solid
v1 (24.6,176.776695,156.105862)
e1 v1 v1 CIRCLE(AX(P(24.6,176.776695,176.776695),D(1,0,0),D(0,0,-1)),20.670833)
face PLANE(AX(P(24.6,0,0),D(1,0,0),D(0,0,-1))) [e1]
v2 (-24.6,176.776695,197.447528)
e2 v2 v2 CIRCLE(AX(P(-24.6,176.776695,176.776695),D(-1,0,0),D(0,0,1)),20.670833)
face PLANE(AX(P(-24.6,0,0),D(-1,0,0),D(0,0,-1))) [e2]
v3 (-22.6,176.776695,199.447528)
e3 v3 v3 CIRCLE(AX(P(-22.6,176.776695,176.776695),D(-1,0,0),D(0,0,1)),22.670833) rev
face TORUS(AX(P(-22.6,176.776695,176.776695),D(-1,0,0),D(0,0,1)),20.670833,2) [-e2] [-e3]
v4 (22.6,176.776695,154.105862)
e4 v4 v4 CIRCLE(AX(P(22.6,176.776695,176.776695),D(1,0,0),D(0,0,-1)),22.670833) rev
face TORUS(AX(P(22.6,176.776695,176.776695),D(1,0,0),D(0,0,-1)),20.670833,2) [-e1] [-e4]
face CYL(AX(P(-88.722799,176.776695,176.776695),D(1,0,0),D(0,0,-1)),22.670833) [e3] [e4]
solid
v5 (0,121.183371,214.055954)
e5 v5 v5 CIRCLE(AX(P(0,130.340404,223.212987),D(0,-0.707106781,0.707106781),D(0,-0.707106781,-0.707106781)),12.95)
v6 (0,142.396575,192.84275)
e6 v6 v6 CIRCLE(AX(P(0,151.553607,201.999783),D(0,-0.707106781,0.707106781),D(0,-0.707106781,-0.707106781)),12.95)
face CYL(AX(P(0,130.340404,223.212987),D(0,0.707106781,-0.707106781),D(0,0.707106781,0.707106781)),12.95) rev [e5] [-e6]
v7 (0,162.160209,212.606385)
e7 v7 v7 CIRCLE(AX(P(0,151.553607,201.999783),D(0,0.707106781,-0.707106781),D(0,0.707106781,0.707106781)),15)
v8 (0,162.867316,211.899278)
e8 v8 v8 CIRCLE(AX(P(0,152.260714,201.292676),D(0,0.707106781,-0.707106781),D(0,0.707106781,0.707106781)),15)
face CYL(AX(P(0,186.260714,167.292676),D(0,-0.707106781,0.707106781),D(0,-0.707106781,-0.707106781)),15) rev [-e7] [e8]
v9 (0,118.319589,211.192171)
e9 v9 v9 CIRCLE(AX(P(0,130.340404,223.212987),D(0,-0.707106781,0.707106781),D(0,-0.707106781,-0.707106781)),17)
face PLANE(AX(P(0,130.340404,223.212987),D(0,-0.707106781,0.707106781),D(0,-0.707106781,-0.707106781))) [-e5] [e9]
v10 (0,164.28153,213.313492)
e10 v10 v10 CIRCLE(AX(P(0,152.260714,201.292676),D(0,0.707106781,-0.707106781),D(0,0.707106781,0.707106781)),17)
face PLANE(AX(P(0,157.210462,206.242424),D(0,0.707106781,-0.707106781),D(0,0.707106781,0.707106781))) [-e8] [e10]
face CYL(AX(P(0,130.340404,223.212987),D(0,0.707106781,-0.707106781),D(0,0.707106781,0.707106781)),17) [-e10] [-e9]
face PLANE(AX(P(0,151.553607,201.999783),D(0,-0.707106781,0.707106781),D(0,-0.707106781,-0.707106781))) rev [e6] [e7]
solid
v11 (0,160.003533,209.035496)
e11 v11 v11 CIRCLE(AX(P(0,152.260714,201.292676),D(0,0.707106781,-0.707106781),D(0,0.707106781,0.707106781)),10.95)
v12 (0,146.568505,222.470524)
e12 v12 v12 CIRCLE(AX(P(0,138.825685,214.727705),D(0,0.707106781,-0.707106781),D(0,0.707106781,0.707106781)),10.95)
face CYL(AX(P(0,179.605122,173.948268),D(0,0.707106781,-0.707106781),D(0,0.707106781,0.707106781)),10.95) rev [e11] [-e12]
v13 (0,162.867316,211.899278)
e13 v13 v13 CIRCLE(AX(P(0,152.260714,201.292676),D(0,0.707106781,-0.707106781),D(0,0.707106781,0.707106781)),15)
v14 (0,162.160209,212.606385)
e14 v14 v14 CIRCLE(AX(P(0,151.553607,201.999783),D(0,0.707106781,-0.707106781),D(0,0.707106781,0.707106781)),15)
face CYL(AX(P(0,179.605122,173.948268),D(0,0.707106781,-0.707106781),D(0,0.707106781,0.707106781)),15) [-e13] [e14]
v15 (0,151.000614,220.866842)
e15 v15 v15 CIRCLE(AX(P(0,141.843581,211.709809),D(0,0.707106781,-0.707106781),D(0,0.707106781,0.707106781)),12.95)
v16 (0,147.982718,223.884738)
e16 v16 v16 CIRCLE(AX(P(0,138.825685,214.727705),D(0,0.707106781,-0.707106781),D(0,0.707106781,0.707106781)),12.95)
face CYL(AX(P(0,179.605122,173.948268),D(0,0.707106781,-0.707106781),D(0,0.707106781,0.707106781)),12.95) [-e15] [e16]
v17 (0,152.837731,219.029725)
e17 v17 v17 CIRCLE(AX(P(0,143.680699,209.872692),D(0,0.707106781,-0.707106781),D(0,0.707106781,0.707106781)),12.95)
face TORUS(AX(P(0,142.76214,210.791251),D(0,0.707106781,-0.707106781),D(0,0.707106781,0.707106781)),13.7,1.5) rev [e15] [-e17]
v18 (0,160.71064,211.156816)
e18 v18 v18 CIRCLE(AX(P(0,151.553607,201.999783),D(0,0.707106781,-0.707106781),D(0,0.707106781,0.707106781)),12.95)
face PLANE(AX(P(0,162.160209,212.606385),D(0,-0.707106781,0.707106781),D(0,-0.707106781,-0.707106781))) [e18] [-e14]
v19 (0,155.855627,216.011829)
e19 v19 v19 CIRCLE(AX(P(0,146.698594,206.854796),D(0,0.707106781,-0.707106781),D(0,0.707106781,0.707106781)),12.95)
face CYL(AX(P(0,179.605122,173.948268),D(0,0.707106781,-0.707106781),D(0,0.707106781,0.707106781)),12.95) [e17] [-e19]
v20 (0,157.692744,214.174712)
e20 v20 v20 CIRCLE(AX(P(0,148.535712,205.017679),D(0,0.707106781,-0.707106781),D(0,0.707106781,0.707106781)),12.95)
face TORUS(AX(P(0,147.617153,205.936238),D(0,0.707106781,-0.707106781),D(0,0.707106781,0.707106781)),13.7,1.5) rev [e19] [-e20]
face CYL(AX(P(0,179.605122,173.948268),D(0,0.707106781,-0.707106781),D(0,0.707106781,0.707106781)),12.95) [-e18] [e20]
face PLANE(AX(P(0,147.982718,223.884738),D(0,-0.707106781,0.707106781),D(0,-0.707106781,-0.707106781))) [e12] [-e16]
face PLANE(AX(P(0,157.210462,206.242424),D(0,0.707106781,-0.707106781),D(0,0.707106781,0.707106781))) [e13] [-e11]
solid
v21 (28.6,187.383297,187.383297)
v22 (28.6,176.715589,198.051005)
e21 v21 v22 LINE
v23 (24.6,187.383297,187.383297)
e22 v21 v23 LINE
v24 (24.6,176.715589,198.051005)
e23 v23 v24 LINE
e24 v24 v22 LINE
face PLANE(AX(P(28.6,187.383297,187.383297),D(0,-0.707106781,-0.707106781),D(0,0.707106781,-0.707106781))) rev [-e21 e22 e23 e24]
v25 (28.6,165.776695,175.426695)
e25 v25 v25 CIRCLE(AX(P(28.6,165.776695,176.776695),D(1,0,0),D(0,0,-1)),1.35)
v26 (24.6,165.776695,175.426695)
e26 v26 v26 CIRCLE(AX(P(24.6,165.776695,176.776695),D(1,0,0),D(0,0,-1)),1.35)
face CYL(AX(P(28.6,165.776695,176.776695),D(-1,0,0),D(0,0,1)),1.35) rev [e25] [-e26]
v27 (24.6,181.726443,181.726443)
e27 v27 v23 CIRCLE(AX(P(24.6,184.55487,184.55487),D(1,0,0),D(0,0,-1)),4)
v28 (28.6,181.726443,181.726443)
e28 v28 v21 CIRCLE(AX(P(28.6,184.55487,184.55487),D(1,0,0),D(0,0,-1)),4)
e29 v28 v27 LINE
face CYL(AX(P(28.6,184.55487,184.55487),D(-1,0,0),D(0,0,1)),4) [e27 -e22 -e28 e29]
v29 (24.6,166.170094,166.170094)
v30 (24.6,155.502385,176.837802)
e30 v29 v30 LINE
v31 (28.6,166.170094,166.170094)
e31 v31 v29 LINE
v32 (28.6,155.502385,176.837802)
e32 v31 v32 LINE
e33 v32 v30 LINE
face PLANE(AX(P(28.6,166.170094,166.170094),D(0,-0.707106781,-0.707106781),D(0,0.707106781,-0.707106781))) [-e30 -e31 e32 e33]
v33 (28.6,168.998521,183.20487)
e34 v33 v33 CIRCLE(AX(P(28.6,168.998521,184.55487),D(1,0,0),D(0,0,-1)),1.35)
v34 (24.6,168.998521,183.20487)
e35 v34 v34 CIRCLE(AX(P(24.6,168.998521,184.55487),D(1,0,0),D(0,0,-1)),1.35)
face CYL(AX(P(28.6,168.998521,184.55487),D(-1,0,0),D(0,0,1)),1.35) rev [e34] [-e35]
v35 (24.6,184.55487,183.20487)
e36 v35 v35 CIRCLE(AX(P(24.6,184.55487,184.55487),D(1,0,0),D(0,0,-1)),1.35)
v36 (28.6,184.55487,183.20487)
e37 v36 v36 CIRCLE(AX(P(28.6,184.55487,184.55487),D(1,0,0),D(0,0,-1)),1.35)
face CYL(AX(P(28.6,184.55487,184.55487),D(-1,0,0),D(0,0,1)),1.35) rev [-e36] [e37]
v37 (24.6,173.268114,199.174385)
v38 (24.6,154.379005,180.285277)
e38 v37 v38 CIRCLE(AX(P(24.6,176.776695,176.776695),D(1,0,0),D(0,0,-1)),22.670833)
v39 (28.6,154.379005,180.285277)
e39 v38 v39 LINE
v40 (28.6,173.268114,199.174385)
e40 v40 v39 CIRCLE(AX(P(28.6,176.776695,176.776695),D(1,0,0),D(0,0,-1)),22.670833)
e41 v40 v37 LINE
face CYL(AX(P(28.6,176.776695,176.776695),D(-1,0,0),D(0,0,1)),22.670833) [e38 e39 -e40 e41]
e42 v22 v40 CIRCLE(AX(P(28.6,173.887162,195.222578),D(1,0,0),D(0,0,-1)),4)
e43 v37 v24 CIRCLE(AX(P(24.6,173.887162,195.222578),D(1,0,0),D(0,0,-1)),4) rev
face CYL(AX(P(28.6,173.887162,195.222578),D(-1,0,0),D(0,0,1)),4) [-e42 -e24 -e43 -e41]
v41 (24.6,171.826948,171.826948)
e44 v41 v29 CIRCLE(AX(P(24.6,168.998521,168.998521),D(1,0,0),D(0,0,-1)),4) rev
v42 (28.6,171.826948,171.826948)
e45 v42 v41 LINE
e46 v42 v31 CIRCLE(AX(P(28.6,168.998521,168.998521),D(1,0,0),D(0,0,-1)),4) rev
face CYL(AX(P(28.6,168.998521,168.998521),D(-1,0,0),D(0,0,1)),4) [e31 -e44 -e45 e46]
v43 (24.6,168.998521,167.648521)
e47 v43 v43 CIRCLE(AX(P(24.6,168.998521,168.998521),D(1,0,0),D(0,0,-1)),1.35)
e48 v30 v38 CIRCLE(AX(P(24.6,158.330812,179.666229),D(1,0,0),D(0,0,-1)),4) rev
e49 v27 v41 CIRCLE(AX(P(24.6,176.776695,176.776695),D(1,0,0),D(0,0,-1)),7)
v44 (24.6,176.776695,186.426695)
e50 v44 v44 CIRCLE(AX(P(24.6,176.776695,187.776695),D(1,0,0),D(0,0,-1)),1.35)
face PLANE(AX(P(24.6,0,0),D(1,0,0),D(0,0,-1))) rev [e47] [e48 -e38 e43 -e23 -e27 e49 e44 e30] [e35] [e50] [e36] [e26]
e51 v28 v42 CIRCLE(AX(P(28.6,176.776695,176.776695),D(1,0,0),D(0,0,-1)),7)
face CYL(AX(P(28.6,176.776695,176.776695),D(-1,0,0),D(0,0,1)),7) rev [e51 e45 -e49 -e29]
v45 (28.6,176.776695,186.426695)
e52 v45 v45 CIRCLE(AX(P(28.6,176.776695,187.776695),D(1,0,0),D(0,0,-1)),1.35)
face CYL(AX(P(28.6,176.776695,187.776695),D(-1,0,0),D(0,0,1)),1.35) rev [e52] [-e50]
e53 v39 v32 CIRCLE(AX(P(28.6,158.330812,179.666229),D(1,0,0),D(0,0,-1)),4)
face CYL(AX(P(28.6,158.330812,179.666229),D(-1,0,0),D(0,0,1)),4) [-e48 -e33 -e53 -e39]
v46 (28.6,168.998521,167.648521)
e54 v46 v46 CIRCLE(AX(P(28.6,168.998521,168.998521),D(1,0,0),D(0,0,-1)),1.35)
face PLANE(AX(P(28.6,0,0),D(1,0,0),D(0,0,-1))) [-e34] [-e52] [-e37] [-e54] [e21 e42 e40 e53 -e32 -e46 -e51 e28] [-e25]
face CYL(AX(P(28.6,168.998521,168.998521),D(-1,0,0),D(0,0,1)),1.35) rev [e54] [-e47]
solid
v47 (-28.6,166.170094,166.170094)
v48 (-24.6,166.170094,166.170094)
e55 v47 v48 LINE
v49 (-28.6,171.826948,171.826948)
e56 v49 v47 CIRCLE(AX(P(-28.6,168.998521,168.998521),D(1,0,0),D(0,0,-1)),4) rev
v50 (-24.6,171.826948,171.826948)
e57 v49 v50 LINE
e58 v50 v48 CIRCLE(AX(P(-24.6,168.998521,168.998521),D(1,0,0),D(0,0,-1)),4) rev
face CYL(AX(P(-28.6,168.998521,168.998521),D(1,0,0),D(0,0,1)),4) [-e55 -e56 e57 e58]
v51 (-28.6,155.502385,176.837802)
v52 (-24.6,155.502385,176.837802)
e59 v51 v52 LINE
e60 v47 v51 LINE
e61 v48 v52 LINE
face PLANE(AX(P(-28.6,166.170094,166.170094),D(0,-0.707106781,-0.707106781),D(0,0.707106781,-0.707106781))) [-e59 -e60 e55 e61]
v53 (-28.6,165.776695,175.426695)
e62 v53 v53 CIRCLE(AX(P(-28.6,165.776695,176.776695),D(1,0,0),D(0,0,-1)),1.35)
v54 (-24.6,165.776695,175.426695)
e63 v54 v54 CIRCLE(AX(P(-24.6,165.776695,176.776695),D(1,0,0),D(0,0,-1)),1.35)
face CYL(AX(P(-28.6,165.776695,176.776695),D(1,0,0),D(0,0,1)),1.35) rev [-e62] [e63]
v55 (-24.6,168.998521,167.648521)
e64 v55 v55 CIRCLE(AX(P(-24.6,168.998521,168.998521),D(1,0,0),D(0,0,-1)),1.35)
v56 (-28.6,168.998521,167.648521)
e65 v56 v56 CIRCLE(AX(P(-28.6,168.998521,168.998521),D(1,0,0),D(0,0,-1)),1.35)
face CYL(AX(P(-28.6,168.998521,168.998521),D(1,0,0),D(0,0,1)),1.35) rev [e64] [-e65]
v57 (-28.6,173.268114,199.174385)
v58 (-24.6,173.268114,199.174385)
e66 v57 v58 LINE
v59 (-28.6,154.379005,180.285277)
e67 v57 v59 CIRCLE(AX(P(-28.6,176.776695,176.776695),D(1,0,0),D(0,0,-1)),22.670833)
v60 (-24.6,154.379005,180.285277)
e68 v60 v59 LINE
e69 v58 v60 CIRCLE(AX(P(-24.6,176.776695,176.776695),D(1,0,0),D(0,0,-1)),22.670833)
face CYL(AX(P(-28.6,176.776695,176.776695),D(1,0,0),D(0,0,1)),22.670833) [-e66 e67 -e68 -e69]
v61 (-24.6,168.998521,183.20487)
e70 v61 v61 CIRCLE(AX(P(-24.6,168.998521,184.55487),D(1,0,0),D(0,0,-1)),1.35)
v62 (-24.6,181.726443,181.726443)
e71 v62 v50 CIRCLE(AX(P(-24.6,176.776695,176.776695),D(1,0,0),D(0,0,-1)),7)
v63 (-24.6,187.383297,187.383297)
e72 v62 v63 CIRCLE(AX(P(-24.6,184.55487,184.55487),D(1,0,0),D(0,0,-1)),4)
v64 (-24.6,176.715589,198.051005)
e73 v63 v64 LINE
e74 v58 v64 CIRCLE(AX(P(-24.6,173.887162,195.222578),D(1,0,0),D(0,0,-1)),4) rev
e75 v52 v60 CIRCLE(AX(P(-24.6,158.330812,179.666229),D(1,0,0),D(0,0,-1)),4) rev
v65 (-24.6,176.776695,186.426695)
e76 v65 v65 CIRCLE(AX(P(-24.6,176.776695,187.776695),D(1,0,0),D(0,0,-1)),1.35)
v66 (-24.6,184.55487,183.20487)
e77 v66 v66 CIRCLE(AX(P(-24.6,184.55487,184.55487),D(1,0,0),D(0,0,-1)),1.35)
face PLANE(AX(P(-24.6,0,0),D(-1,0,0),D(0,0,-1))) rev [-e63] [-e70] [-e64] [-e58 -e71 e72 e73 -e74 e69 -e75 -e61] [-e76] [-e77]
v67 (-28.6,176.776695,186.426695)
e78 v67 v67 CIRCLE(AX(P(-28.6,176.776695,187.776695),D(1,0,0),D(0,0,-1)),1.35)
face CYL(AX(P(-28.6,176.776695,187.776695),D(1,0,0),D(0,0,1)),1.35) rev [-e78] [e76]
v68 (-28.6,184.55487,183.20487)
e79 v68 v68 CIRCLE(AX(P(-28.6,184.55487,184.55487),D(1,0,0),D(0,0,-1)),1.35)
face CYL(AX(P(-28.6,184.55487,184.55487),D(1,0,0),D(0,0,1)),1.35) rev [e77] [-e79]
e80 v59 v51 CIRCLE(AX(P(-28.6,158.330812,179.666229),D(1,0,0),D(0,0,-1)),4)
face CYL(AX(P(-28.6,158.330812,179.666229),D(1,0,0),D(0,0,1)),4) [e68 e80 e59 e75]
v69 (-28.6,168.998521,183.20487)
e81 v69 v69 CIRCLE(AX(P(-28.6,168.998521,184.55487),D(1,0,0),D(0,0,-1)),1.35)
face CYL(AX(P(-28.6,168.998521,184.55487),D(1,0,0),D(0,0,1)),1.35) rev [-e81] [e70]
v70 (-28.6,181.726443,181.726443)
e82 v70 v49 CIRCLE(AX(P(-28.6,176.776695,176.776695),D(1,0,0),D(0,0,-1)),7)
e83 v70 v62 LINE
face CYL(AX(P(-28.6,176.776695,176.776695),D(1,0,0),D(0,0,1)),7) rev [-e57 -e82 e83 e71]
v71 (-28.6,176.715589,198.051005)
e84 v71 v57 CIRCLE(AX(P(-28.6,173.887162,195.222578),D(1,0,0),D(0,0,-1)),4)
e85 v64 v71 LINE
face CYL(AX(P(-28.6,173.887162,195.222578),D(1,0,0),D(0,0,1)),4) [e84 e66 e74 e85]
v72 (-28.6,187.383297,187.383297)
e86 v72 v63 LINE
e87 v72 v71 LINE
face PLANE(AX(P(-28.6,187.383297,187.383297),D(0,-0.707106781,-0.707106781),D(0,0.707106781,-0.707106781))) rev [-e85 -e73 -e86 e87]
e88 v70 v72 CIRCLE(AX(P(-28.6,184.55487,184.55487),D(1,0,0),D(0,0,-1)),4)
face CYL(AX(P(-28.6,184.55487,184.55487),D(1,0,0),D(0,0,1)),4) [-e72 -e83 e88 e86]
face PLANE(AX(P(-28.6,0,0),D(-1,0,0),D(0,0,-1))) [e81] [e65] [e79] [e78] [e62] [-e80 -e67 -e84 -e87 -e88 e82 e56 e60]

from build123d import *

# Parameters (mm, degrees)
BOSS_EXTRUDE1_START = 24.6
SKETCH2_R           = 1.35
BOSS_EXTRUDE1_DEPTH = 4
FILLET1_R           = 4
BOSS_EXTRUDE3_START = -24.6
SKETCH3_R           = 22.670832933
BOSS_EXTRUDE3_DEPTH = 49.2
FILLET2_R           = 2
SKETCH4_R           = 17
SKETCH4_R_2         = 12.95
BOSS_EXTRUDE4_DEPTH = 30
BOSS_EXTRUDE5_START = 1
SKETCH5_R           = 17
SKETCH5_R_2         = 15
BOSS_EXTRUDE5_DEPTH = 1


# Read off the part's stored shape, not the designer's step: Body-Move/Copy2
with BuildPart() as part:
    # Body-Move/Copy2 outline → Body-Move/Copy2 (revolve)
    with BuildSketch(Plane(origin=(0, 176.776695297, 176.776695297), x_dir=(1, 0, 0), z_dir=(0, 0.7071067811865516, 0.7071067811865436))):
        with BuildLine():
            Line((10.95, -34.670832933), (10.95, -53.670832933))
            Line((10.95, -53.670832933), (12.95, -53.670832933))
            Line((12.95, -53.670832933), (12.95, -49.40288374))
            ThreePointArc((12.95, -49.40288374), (12.2, -48.103845634), (12.95, -46.804807529))
            Line((12.95, -46.804807529), (12.95, -42.536858337))
            ThreePointArc((12.95, -42.536858337), (12.2, -41.237820231), (12.95, -39.938782125))
            Line((12.95, -39.938782125), (12.95, -35.670832933))
            Line((12.95, -35.670832933), (15, -35.670832933))
            Line((15, -35.670832933), (15, -34.670832933))
            Line((15, -34.670832933), (10.95, -34.670832933))
        make_face()
    revolve(axis=Axis((0, 176.776695297, 176.776695297), (0, 0.7071067811865436, -0.7071067811865516)))


with BuildPart() as body_2:
    # Sketch2 → Boss-Extrude1 (new body)
    with BuildSketch(Plane(origin=(0, 0, 0), x_dir=(0, 0, -1), z_dir=(1, 0, 0)).offset(BOSS_EXTRUDE1_START)):
        with BuildLine():
            Line((-187.383297014, 187.383297014), (-199.403419016, 175.363175013))
            ThreePointArc((-199.403419016, 175.363175013), (-192.807394999, 160.745995595), (-178.19021558, 154.149971577))
            Line((-178.19021558, 154.149971577), (-166.170093579, 166.170093579))
            ThreePointArc((-166.170093579, 166.170093579), (-166.170093579, 171.826947828), (-171.826947828, 171.826947828))
            ThreePointArc((-171.826947828, 171.826947828), (-181.726442765, 171.826947828), (-181.726442765, 181.726442765))
            ThreePointArc((-181.726442765, 181.726442765), (-181.726442765, 187.383297014), (-187.383297014, 187.383297014))
        make_face()
        with Locations((-184.55486989, 168.998520704)):
            Circle(SKETCH2_R, mode=Mode.SUBTRACT)
        with Locations((-184.55486989, 184.55486989)):
            Circle(SKETCH2_R, mode=Mode.SUBTRACT)
        with Locations((-187.776695297, 176.776695297)):
            Circle(SKETCH2_R, mode=Mode.SUBTRACT)
        with Locations((-176.776695297, 165.776695297)):
            Circle(SKETCH2_R, mode=Mode.SUBTRACT)
        with Locations((-168.998520704, 168.998520704)):
            Circle(SKETCH2_R, mode=Mode.SUBTRACT)
    extrude(amount=BOSS_EXTRUDE1_DEPTH)

    # Fillet1
    fillet1_edges = [body_2.edges().sort_by_distance(p)[0] for p in [
        (26.6, 154.149971577, 178.19021558),
        (26.6, 175.363175013, 199.403419016),
    ]]
    fillet(fillet1_edges, radius=FILLET1_R)


with BuildPart() as body_3:
    # Mirror1: mirrored copy
    add(body_2.part.mirror(Plane(origin=(0, 0, 0), x_dir=(0, 0, 1), z_dir=(1, 0, 0))))


with BuildPart() as body_4:
    # Sketch3 → Boss-Extrude3 (new body)
    with BuildSketch(Plane(origin=(0, 0, 0), x_dir=(0, 0, -1), z_dir=(1, 0, 0)).offset(BOSS_EXTRUDE3_START)):
        with Locations((-176.776695297, 176.776695297)):
            Circle(SKETCH3_R)
    extrude(amount=BOSS_EXTRUDE3_DEPTH)

    # Fillet2
    fillet2_edges = [body_4.edges().sort_by_distance(p)[0] for p in [
        (24.6, 176.776695297, 199.447528229),
        (-24.6, 176.776695297, 199.447528229),
    ]]
    fillet(fillet2_edges, radius=FILLET2_R)


with BuildPart() as body_5:
    # Sketch4 → Boss-Extrude4 (new body)
    with BuildSketch(Plane(origin=(0, -25.223087857, 25.223087857), x_dir=(1, 0, 0), z_dir=(0, -0.7071067811865437, 0.7071067811865515))):
        with Locations(Location((0, 250, 0), (0, 0, 270))):
            Circle(SKETCH4_R)
        with Locations(Location((0, 250, 0), (0, 0, 270))):
            Circle(SKETCH4_R_2, mode=Mode.SUBTRACT)
    extrude(amount=BOSS_EXTRUDE4_DEPTH)

    # Sketch5 → Boss-Extrude5 (add)
    with BuildSketch(Plane(origin=(0, -25.223087857, 25.223087857), x_dir=(1, 0, 0), z_dir=(0, 0.7071067811865438, -0.7071067811865513)).offset(BOSS_EXTRUDE5_START)):
        with Locations(Location((0, -250, 0), (0, 0, 270))):
            Circle(SKETCH5_R)
        with Locations(Location((0, -250, 0), (0, 0, 270))):
            Circle(SKETCH5_R_2, mode=Mode.SUBTRACT)
    extrude(amount=-BOSS_EXTRUDE5_DEPTH)


solid = Compound([part.part, body_2.part, body_3.part, body_4.part, body_5.part])
